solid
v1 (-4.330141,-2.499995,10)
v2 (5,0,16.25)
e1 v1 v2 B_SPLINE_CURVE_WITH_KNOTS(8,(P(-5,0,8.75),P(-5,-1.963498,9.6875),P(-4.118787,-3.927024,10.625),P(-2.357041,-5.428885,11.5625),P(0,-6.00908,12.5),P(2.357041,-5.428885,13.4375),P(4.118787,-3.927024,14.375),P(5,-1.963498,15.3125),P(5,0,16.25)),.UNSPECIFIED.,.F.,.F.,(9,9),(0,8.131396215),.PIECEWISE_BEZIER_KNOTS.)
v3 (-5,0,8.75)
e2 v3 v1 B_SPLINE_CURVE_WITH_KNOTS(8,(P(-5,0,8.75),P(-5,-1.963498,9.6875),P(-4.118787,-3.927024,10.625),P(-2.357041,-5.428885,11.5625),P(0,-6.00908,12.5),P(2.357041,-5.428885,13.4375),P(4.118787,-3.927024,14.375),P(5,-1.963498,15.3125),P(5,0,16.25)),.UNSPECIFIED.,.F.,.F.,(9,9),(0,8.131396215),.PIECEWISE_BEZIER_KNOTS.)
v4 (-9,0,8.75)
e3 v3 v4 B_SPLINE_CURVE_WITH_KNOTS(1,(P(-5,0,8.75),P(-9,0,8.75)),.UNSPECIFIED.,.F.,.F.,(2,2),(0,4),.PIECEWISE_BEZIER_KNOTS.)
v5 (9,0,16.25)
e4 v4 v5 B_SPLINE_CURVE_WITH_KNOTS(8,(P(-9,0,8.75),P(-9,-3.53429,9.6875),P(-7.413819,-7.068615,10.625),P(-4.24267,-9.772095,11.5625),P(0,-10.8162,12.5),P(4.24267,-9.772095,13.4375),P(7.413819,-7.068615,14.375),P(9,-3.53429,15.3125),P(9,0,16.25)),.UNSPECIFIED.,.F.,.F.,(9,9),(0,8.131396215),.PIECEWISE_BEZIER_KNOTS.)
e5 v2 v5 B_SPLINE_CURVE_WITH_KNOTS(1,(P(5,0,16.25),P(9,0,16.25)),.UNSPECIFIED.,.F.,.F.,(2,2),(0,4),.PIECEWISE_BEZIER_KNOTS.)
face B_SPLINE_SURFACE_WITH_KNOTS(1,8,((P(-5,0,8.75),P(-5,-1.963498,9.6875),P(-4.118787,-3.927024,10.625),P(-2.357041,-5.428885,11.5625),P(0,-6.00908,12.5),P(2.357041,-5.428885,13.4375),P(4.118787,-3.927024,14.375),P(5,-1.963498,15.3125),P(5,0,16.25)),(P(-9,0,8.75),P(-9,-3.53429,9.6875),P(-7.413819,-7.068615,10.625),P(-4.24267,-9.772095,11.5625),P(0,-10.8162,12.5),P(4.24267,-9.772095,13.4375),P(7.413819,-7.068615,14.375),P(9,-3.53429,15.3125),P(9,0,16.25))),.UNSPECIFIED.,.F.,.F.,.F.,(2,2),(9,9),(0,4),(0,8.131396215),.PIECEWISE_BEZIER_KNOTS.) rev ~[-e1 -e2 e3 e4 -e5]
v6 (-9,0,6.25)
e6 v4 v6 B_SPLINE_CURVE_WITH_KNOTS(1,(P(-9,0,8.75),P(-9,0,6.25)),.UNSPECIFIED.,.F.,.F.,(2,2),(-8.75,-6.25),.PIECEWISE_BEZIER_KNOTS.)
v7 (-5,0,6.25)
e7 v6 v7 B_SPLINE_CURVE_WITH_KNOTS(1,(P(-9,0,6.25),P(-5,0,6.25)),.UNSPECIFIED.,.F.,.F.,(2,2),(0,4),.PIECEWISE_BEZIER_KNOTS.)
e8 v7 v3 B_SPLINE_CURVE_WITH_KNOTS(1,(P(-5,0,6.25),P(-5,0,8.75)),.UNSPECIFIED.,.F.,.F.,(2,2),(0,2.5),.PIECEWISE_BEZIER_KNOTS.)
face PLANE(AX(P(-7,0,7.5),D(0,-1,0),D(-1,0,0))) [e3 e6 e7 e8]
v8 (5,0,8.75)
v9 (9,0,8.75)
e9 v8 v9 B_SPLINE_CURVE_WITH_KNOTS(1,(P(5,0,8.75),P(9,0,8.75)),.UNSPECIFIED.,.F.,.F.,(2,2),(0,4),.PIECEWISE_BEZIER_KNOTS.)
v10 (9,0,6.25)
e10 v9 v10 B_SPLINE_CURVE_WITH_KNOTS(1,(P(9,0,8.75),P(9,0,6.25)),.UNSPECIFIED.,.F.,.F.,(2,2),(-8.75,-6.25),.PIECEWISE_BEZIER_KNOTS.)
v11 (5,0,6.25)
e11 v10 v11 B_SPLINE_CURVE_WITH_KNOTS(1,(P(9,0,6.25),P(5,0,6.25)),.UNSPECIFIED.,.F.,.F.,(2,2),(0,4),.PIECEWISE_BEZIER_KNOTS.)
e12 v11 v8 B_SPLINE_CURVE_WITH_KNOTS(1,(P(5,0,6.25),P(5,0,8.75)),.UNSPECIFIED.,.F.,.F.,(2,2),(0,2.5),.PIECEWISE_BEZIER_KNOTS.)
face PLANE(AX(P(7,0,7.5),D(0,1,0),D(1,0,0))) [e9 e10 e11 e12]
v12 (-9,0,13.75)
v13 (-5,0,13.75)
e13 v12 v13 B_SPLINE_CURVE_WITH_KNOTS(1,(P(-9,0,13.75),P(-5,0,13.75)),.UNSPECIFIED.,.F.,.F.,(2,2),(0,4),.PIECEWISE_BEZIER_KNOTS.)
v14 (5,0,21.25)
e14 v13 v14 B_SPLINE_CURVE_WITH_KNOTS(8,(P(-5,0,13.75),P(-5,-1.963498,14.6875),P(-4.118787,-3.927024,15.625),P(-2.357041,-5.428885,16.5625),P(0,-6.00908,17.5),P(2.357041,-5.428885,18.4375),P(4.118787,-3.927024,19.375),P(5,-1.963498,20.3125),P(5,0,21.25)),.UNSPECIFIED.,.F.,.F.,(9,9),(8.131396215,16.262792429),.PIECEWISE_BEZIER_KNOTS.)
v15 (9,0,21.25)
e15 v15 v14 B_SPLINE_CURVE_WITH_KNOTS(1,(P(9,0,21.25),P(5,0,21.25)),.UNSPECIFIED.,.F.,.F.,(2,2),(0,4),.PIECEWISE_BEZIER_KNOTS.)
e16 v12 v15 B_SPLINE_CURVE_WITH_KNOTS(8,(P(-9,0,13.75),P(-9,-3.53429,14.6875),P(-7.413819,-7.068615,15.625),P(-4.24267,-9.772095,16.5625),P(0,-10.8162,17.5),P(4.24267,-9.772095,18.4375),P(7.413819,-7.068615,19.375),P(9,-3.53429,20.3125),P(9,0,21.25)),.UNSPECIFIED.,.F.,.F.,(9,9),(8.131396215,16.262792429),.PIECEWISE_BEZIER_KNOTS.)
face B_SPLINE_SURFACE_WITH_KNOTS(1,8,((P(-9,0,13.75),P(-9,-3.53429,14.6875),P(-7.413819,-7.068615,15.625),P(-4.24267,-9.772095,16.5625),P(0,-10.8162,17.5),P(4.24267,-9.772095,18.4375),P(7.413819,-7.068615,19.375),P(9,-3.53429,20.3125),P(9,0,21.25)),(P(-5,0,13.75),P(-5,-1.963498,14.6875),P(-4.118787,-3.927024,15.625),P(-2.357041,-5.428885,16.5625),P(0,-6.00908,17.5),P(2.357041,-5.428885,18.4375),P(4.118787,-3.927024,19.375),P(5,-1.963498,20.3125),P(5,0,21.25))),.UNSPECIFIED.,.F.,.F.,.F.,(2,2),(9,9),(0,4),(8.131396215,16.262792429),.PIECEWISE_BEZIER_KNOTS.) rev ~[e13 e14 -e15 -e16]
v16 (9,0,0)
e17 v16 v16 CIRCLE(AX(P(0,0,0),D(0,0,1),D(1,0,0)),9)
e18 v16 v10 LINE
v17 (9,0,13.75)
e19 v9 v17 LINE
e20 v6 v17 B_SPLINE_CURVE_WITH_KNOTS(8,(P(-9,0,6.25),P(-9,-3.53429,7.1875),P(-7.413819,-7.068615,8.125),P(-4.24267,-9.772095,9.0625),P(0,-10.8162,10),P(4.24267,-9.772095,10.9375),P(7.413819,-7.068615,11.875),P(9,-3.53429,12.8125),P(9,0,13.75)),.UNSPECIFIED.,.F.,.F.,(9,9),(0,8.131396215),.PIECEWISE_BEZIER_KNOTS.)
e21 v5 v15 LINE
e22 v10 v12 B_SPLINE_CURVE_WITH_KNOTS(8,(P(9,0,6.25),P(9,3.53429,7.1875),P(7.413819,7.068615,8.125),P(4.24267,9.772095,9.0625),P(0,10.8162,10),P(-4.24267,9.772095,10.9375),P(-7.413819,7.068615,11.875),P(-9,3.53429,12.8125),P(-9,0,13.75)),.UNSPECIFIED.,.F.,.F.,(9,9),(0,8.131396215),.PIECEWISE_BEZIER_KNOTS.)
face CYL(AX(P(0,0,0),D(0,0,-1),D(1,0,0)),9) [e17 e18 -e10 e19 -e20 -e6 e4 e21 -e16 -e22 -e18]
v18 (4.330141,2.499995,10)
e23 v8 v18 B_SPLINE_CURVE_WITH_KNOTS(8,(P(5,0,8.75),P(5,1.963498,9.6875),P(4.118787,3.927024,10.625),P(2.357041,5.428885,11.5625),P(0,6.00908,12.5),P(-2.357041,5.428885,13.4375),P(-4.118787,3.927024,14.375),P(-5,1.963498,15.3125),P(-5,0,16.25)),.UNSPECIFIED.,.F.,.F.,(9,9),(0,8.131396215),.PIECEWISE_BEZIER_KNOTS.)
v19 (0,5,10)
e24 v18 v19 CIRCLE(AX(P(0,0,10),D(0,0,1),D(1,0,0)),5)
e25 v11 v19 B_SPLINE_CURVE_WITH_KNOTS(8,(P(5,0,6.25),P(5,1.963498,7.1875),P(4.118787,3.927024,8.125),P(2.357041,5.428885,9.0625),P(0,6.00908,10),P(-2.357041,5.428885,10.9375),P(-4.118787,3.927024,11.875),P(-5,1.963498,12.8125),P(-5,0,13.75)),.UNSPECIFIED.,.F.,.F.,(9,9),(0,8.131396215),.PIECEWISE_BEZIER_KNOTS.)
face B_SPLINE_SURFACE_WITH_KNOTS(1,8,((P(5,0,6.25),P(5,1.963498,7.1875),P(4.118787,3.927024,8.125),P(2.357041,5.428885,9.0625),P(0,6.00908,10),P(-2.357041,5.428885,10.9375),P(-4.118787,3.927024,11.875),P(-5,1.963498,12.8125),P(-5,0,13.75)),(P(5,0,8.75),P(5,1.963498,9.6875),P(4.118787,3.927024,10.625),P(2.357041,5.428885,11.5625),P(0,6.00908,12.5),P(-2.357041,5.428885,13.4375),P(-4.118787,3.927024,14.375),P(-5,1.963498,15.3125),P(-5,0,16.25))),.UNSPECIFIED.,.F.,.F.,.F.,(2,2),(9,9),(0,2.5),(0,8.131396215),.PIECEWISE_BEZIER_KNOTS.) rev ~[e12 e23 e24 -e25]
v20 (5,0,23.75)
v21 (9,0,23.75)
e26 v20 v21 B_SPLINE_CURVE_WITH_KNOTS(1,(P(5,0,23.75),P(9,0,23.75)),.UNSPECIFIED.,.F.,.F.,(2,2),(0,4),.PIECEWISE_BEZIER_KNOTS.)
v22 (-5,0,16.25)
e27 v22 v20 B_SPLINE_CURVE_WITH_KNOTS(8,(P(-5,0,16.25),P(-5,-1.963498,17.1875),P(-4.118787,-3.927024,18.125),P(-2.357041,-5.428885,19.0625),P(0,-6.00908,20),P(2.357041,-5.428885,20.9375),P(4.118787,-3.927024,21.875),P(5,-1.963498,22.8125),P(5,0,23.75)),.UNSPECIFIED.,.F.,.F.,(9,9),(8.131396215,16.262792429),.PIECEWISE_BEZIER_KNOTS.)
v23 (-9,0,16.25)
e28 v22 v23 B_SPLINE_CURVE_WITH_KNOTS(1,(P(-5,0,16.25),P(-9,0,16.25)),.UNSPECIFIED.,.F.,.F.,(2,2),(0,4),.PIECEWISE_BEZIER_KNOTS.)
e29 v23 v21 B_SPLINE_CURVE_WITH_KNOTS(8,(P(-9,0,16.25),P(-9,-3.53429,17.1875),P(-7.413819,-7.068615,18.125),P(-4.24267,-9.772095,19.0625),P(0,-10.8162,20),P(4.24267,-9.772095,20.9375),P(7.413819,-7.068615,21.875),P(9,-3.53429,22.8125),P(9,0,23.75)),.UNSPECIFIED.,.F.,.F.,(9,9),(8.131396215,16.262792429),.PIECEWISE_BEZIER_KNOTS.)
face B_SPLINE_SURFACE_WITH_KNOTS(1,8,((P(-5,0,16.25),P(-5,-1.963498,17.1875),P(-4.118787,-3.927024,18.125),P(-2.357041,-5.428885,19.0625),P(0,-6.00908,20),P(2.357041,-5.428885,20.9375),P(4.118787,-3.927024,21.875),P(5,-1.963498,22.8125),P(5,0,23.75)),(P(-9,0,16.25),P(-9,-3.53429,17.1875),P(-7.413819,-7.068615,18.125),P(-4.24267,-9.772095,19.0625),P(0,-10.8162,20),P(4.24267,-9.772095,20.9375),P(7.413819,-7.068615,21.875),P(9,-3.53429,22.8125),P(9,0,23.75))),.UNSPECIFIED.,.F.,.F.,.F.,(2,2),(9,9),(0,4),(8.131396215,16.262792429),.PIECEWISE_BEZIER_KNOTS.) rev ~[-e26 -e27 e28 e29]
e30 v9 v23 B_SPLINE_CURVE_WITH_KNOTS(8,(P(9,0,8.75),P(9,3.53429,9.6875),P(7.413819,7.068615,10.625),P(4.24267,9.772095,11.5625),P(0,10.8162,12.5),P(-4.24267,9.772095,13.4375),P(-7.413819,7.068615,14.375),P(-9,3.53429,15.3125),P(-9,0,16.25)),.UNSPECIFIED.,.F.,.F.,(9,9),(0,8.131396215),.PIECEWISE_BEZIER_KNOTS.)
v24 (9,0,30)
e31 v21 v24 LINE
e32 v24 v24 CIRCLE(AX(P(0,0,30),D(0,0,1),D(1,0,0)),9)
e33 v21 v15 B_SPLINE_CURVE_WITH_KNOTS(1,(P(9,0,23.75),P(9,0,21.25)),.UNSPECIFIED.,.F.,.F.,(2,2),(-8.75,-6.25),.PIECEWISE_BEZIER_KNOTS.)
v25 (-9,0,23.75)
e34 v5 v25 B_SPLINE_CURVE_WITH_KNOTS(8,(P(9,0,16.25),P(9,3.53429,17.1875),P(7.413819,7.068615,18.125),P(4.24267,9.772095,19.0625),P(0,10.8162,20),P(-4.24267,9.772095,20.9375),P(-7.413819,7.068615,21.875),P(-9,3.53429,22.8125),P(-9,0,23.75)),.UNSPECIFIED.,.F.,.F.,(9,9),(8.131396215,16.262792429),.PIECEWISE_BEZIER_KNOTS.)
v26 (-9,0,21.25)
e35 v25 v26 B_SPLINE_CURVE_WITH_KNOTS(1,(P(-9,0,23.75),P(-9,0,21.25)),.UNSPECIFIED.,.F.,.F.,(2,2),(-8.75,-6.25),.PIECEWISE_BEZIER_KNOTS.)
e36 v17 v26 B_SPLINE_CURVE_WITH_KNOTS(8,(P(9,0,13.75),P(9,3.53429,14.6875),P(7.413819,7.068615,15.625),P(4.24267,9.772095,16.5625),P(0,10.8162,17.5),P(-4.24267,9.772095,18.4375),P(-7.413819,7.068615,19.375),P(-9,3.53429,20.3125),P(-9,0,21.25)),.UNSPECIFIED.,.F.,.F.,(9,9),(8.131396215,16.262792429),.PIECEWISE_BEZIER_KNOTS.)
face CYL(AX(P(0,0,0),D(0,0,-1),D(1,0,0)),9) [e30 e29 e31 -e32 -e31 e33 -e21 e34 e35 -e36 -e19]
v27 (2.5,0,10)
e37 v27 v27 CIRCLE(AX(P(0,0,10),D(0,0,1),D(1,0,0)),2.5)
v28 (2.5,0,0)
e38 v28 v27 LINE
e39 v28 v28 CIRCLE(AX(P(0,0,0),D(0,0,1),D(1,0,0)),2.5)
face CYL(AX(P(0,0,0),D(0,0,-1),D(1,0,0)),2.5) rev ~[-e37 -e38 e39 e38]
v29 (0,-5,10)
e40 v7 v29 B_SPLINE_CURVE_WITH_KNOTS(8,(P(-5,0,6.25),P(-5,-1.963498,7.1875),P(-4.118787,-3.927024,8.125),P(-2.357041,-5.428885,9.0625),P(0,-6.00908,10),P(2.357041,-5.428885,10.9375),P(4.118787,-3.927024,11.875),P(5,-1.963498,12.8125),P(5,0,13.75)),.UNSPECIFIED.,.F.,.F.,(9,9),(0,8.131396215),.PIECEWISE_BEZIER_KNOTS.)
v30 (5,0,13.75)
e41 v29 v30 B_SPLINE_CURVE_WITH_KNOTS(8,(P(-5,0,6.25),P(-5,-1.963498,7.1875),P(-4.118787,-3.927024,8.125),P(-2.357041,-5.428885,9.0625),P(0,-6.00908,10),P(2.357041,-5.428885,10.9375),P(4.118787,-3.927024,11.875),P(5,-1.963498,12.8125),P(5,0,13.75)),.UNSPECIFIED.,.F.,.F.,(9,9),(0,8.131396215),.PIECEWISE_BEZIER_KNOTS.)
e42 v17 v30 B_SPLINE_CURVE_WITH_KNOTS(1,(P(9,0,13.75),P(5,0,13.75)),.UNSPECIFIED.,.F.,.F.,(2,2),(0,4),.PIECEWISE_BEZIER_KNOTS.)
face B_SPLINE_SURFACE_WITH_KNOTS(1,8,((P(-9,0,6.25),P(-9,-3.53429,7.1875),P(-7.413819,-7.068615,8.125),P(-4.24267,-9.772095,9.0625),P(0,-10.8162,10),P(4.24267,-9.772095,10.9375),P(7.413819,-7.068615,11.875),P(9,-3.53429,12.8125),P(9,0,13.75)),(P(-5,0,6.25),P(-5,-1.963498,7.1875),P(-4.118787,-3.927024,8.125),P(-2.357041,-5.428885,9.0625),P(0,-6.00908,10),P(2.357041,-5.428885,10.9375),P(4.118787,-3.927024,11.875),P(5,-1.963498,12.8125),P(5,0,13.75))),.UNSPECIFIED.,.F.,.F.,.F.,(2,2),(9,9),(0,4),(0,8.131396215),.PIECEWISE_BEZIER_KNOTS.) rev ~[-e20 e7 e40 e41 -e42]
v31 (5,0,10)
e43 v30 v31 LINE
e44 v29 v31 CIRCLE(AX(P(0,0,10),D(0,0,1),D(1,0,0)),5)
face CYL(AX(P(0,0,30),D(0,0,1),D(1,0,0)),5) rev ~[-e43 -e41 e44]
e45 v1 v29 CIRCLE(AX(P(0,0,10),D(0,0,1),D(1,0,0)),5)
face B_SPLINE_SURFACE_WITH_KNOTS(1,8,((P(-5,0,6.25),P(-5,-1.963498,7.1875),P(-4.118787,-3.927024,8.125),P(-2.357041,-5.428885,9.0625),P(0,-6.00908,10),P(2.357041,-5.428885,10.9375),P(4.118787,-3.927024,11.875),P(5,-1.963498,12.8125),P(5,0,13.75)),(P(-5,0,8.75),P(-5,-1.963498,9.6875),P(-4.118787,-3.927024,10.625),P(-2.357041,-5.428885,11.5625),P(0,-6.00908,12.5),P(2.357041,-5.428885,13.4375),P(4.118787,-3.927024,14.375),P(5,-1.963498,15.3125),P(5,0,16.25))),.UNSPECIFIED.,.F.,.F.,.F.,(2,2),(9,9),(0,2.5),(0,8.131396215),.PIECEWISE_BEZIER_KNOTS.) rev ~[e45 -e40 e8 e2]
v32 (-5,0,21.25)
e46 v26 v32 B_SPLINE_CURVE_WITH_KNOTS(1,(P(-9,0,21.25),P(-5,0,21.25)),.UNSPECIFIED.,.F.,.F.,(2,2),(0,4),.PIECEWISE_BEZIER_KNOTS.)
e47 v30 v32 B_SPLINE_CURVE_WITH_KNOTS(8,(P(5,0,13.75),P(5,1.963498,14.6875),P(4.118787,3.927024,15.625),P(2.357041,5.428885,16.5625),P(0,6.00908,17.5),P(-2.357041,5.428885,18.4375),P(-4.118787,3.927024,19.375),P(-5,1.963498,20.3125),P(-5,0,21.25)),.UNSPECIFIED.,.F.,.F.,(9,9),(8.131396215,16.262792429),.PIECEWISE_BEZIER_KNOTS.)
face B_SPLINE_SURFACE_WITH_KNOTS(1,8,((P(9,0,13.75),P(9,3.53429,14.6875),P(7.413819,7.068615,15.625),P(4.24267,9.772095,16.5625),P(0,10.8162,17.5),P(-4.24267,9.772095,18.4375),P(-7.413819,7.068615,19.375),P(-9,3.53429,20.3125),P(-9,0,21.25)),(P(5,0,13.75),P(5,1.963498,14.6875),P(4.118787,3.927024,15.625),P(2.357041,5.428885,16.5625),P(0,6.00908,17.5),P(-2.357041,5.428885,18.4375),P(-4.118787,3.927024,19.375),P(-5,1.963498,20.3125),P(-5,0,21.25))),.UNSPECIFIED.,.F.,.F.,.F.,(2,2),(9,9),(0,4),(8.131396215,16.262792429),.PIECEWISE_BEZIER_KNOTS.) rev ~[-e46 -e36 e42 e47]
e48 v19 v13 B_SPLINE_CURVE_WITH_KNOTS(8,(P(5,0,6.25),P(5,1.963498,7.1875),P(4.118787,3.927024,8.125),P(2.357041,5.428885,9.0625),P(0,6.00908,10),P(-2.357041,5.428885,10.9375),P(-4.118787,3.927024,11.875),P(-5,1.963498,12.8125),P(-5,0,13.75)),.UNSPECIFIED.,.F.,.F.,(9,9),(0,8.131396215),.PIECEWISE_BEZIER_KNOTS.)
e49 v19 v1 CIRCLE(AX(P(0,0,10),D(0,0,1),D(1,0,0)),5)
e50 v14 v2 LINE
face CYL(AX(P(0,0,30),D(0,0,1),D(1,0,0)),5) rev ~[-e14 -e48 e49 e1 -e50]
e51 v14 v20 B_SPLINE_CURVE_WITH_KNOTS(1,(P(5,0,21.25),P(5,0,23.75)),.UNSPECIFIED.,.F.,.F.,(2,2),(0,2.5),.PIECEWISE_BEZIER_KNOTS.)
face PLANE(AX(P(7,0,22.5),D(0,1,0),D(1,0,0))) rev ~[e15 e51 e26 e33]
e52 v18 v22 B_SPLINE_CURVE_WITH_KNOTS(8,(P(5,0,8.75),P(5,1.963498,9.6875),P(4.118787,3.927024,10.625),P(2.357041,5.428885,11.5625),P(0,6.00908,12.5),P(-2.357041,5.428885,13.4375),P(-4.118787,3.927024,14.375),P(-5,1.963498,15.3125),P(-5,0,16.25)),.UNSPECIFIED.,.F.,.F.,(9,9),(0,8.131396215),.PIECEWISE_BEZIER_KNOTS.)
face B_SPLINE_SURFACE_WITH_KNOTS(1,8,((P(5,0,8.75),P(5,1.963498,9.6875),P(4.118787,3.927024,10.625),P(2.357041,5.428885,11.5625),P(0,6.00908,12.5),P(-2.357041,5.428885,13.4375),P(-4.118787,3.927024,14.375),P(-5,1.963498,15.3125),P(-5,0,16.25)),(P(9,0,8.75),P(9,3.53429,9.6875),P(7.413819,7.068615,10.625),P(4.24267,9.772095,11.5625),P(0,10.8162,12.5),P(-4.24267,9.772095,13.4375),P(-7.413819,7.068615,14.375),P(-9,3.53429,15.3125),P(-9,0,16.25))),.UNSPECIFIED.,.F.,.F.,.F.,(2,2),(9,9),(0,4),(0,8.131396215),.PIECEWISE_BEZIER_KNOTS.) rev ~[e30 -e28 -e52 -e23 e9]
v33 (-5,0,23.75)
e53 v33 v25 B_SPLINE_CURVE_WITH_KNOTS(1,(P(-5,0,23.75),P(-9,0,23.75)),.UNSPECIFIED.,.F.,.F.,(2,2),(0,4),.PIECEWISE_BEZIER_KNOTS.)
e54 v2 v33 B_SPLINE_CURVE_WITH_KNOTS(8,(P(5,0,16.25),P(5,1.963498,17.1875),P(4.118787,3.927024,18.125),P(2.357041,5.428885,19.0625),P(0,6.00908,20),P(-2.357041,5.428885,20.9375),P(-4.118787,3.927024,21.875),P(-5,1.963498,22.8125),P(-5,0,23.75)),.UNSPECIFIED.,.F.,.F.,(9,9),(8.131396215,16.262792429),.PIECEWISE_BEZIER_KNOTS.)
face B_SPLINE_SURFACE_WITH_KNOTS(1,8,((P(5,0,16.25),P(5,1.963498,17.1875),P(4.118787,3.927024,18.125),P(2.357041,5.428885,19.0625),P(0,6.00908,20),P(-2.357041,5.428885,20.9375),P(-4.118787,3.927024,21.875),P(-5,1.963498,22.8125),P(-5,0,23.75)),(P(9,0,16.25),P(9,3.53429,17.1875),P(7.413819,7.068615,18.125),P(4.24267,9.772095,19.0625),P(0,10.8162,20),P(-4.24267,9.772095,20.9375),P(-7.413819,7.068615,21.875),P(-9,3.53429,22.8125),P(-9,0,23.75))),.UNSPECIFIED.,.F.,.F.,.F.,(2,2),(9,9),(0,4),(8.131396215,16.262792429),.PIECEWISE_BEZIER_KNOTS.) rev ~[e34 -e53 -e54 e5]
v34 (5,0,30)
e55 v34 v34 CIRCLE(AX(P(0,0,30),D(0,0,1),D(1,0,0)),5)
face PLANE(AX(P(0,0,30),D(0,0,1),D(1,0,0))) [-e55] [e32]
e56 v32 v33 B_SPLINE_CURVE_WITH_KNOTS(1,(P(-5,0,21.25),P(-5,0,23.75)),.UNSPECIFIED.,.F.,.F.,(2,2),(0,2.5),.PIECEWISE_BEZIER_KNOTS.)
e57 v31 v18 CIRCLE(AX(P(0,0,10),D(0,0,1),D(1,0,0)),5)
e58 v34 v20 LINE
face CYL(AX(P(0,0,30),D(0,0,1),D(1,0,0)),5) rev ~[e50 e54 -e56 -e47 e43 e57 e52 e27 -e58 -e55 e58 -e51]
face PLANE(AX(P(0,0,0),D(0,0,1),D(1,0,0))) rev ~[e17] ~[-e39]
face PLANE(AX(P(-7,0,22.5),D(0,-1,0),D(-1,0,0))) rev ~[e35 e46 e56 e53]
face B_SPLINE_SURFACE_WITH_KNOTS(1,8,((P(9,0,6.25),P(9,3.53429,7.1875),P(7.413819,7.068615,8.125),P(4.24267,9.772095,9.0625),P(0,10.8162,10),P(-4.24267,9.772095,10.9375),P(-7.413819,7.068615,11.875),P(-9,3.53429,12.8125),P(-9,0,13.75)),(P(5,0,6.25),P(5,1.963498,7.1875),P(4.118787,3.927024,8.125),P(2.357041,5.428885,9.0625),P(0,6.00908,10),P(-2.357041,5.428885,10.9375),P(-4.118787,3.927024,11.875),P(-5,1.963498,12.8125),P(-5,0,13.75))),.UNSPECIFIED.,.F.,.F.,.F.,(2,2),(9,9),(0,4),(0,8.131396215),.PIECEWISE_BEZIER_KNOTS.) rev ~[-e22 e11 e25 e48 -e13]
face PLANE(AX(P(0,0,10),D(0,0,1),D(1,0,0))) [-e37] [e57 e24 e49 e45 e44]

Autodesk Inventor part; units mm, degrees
ref_plane "YZ Plane" through (0, 0, 0) normal (1, 0, 0) x (0, 1, 0)
ref_plane "XZ Plane" through (0, 0, 0) normal (0, 1, 0) x (-1, 0, 0)
ref_plane "XY Plane" through (0, 0, 0) normal (0, 0, 1) x (1, 0, 0)
sketch "Sketch1" plane through (0, 0, 0) normal (0, 0, 1) x (1, 0, 0)
  circle A0 centre (0, 0) radius 9
  circle A1 centre (0, 0) radius 2.5
  dimension "d0" = 18
  dimension "d3" = 5
extrude "Extrusion1" add sketch "Sketch1" along normal blind 30
sketch "Sketch2" plane through (0, 0, 30) normal (0, 0, 1) x (1, 0, 0)
  circle A0 centre (0, 0) radius 2.5 projected
  circle A1 centre (0, 0) radius 9 projected
  circle A2 centre (0, 0) radius 5
  dimension "d4" = 10
extrude "Extrusion2" cut sketch "Sketch2" against normal blind 20 contours A2
sketch "Sketch3" plane through (0, 0, 0) normal (0, 1, 0) x (-1, 0, 0)
  line L0 (9, 30) -> (9, 0) projected
  line L1 (9, 0) -> (2.5, 0) projected
  line L2 (2.5, 0) -> (2.5, 10) projected
  line L3 (2.5, 10) -> (5, 10) projected
  line L4 (5, 10) -> (5, 30) projected
  line L5 (5, 30) -> (9, 30) projected
  line L6 (-9, 0) -> (-9, 30) projected
  line L7 (-9, 30) -> (-5, 30) projected
  line L8 (-5, 30) -> (-5, 10) projected
  line L9 (-5, 10) -> (-2.5, 10) projected
  line L10 (-2.5, 10) -> (-2.5, 0) projected
  line L11 (-2.5, 0) -> (-9, 0) projected
  line L12 (0, 0) -> (9, 0)
  line L13 (9, 0) -> (9, 30)
  line L14 (9, 30) -> (0, 30)
  line L15 (0, 30) -> (0, 0)
  line L16 (-9, 6.25) -> (-5, 6.25)
  line L17 (-5, 6.25) -> (-5, 8.75)
  line L18 (-5, 8.75) -> (-9, 8.75)
  line L19 (-9, 8.75) -> (-9, 6.25)
  line L20 (-9, 15) -> (0, 15) construction
  line L21 (-9, 7.5) -> (-5, 7.5) construction
  dimension "d20" = 2.5
  dimension "d22" = 7.5
extrude "Extrusion3" [suppressed]
coil "Coil1" sketch "Sketch3" operation cut axis through (0, 0, -10) along (0, 0, 1) pitch 15 turns 1 hand right contours L6 L18 L17 L16
pattern_circular "Circular Pattern1" count 2 over 360 about axis through (0, 0, -10) along (0, 0, 1) of "Coil1"
properties part number "z-coupler"
